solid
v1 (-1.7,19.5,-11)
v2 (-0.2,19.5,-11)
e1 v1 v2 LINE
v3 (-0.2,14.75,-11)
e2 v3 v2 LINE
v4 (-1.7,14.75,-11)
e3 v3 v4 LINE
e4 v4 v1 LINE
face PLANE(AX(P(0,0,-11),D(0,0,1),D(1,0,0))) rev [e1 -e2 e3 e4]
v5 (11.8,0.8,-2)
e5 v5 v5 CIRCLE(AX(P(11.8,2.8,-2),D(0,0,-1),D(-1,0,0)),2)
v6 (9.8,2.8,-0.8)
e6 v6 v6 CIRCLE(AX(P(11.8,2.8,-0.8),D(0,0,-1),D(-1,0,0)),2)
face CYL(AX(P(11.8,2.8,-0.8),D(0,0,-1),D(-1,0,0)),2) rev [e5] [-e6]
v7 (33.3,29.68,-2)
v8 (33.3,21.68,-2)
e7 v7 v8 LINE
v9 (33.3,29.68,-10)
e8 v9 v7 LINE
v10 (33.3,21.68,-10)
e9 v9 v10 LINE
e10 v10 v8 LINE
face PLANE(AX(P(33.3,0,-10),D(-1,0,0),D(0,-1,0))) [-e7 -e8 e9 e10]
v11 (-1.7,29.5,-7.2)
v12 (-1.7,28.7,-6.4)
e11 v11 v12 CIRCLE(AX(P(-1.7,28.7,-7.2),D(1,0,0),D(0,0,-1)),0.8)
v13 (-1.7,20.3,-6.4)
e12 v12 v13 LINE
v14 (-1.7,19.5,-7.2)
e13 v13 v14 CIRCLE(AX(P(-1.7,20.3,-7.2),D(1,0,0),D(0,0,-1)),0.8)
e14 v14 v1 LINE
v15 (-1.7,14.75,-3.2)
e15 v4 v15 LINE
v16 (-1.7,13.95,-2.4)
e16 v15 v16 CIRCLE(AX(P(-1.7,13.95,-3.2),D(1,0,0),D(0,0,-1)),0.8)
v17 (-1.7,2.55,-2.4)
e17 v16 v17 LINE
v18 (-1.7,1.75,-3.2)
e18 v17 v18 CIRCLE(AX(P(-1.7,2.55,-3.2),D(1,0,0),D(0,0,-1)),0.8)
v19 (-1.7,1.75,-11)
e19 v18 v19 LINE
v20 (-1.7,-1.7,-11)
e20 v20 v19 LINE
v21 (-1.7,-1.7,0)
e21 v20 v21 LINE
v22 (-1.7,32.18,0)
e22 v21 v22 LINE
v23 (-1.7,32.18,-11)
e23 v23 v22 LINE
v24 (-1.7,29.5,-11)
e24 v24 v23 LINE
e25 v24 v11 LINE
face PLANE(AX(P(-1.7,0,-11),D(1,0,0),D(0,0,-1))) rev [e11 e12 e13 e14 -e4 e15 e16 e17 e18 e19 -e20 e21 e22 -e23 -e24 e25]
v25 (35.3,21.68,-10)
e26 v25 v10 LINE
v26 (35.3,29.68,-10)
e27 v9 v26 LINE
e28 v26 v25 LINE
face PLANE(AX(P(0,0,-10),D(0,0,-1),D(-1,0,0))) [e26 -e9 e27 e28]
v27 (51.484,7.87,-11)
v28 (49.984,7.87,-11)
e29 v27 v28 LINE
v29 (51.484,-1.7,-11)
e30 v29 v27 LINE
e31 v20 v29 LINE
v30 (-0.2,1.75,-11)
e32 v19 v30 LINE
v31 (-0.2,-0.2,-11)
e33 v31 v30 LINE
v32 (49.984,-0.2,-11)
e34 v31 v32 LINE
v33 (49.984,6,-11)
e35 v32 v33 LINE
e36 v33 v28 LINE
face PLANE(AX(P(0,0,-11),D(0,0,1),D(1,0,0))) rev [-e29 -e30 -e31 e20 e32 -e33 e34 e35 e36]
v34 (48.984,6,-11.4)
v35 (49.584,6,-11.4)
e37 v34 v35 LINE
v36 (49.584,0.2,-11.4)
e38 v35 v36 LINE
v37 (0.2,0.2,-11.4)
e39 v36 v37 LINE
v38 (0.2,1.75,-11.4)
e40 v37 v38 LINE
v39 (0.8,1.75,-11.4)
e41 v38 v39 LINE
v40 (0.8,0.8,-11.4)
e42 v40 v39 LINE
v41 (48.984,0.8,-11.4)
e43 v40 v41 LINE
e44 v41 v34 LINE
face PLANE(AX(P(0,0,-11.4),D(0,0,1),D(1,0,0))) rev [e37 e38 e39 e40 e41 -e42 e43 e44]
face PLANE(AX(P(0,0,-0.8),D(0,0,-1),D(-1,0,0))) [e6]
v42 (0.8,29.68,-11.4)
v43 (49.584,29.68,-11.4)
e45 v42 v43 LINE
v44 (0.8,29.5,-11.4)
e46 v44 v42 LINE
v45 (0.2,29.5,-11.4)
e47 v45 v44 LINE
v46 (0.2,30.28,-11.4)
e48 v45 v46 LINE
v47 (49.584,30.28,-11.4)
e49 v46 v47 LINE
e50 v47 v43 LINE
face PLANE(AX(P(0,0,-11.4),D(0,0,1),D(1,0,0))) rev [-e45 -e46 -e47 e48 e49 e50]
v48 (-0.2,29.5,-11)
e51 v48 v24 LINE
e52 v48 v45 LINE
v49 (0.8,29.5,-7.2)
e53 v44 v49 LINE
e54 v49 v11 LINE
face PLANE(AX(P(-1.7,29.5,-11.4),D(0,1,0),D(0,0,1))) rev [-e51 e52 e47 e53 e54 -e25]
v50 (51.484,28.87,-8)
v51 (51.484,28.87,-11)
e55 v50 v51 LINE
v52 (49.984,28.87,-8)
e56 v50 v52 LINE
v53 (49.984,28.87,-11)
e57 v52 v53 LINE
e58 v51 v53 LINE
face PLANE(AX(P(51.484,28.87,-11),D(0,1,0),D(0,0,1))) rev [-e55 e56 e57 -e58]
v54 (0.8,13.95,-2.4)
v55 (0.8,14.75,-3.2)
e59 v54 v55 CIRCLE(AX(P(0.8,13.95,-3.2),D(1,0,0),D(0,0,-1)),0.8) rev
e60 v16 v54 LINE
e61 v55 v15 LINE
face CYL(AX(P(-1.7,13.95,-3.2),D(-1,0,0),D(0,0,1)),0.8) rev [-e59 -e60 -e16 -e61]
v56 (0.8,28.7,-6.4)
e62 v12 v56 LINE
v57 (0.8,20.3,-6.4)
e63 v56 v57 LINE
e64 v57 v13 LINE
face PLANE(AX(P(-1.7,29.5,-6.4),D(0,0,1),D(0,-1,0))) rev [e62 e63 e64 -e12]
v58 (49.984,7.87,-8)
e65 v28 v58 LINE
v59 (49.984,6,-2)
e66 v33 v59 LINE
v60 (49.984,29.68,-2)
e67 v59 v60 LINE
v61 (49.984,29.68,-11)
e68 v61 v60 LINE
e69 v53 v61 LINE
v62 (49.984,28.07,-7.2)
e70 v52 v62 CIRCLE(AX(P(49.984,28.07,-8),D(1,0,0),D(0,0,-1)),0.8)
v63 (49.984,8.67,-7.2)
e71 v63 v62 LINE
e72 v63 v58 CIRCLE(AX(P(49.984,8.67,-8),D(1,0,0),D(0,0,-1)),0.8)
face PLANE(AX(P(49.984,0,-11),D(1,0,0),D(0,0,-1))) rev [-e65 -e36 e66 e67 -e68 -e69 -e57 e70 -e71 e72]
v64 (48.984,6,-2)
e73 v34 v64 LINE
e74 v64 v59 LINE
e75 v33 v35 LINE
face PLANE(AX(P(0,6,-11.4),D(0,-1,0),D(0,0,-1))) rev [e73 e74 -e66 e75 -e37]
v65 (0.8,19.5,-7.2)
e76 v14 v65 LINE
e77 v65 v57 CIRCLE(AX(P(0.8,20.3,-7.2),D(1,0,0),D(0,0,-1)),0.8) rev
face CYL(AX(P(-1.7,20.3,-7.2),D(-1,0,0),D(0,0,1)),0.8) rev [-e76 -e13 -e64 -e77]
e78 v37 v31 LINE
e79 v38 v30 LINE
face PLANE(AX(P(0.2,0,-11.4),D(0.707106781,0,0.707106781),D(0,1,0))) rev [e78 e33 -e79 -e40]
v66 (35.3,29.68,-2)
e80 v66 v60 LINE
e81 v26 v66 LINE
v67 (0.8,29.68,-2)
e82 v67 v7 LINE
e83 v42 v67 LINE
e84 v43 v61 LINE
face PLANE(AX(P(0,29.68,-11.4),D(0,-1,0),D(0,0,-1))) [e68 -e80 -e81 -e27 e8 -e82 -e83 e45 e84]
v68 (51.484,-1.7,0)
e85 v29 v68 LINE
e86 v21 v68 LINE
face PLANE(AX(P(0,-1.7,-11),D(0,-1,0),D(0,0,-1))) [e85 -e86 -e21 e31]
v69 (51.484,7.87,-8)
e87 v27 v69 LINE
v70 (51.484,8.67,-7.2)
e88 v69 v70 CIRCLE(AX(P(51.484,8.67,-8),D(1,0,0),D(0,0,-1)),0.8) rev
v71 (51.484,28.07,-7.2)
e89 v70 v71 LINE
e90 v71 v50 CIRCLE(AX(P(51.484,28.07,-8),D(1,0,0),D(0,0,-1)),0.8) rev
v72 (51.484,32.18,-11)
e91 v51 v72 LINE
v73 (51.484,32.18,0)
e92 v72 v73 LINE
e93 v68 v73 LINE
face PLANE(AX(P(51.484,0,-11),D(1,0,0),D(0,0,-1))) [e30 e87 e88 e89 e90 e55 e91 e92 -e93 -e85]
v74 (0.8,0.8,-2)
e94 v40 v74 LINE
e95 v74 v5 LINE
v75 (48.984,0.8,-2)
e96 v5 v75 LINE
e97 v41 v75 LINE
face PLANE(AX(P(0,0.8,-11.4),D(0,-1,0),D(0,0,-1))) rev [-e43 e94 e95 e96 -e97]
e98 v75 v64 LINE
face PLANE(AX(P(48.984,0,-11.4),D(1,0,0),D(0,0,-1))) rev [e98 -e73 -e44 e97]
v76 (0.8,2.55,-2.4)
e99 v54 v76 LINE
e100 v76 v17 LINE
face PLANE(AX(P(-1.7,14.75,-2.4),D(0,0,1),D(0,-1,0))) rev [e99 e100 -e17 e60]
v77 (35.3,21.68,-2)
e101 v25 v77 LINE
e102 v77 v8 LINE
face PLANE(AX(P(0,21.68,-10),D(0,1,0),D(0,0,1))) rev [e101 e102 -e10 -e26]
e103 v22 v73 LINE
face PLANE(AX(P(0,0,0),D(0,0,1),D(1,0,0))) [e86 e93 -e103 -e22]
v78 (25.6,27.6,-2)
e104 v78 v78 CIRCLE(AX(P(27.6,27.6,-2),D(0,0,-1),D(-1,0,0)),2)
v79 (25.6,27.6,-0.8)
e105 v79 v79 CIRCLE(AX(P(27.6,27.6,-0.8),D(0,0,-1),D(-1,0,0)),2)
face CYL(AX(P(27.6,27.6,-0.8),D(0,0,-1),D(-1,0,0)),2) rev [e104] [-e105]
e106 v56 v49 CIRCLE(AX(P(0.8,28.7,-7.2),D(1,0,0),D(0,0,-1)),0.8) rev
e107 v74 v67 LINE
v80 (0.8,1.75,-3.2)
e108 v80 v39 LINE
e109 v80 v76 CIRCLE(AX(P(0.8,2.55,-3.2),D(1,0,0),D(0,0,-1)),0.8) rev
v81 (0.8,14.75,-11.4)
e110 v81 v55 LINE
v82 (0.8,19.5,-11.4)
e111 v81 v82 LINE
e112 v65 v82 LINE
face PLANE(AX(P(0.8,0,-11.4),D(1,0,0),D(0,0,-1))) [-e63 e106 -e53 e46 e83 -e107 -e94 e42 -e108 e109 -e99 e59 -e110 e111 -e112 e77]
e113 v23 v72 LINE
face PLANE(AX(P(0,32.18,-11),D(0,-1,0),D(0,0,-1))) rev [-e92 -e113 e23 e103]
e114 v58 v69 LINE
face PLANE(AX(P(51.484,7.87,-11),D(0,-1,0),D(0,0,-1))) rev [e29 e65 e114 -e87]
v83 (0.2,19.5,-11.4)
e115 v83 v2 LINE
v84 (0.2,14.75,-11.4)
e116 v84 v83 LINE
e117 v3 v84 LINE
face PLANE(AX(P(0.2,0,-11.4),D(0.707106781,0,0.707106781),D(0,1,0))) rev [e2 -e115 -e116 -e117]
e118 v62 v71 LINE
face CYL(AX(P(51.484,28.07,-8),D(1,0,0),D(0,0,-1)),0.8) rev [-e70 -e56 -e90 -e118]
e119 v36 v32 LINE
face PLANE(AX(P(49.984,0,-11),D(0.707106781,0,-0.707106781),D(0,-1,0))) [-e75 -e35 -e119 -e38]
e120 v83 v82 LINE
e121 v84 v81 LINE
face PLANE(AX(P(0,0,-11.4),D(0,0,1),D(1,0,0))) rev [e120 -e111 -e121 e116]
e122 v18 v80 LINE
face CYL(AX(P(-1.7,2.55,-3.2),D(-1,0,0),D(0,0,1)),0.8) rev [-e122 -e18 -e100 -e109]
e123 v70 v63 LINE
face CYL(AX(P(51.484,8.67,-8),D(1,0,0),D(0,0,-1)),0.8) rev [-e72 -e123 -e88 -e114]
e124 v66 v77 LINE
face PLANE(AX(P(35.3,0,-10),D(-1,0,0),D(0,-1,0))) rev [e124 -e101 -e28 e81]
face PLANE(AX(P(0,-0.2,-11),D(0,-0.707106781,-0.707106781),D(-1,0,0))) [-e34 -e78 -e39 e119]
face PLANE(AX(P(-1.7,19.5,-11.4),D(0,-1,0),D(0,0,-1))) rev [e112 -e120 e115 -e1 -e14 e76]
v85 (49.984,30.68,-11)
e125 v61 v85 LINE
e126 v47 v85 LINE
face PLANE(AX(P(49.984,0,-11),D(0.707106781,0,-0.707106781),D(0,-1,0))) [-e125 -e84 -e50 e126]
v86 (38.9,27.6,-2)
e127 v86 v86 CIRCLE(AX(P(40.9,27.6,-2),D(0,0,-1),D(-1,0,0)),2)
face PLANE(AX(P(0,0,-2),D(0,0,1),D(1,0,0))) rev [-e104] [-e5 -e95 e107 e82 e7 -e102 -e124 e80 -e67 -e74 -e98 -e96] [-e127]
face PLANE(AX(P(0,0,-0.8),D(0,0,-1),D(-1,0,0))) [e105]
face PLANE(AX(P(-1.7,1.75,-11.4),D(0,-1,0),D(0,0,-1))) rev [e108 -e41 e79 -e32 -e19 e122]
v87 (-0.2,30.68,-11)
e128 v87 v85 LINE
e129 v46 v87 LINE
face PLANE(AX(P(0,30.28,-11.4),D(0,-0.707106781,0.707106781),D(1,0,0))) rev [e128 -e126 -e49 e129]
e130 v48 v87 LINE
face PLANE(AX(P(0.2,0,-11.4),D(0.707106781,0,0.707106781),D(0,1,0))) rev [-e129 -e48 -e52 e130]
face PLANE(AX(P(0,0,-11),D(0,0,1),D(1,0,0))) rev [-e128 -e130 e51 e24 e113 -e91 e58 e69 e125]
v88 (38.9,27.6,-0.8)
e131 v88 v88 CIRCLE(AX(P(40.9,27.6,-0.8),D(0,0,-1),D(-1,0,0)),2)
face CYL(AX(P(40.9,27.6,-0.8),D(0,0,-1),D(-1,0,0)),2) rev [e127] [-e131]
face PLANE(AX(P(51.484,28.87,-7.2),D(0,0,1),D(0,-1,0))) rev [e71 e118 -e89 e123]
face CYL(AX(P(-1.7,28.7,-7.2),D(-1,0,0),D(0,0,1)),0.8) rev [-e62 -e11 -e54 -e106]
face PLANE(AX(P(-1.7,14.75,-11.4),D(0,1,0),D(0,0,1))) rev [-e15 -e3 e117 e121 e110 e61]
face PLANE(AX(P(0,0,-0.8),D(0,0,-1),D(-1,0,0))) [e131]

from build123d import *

# Parameters (mm, degrees)
SKETCH_1_W          = 48.184
SKETCH_1_H          = 28.88
SKETCH_1_W_2        = 1
SKETCH_1_H_2        = 23.68
EXTRUDE_1_DEPTH     = 2
EXTRUDE_2_DEPTH     = 11.4
SKETCH_1_7_W        = 53.184
SKETCH_1_7_H        = 33.88
SKETCH_1_7_W_2      = 50.184
SKETCH_1_7_H_2      = 30.88
EXTRUDE_3_DEPTH     = 11
SKETCH_2_W          = 3.8
SKETCH_2_H          = 21
CUT_EXTRUDE_1_DEPTH = 62.941490586
SKETCH_3_W          = 5
SKETCH_3_H          = 10
SKETCH_3_W_2        = 9
SKETCH_3_H_2        = 13
CUT_EXTRUDE_2_DEPTH = 62.109575813
FILLET_1_R          = 0.8
CHAMFER_1_SIZE      = 0.4
SKETCH_4_R          = 2
CUT_EXTRUDE_3_DEPTH = 1.2
SKETCH_4_3_W        = 2
SKETCH_4_3_H        = 8
EXTRUDE_4_DEPTH     = 8


with BuildPart() as part:
    # Эскиз1 → Бобышка-Вытянуть1 (new body)
    with BuildSketch(Plane.XY):
        with Locations((24.892, 15.24)):
            Rectangle(SKETCH_1_W, SKETCH_1_H)
        with Locations((49.484, 17.84)):
            Rectangle(SKETCH_1_W_2, SKETCH_1_H_2)
    extrude(amount=-EXTRUDE_1_DEPTH)

    # Эскиз1<6> → Бобышка-Вытянуть2 (add)
    with BuildSketch(Plane.XY):
        Polygon((0.8, 29.68), (48.984, 29.68), (49.984, 29.68), (49.984, 30.68), (-0.2, 30.68), (-0.2, -0.2), (49.984, -0.2), (49.984, 6), (48.984, 6), (48.984, 0.8), (0.8, 0.8), align=None)
    extrude(amount=-EXTRUDE_2_DEPTH)

    # Эскиз1<7> → Бобышка-Вытянуть3 (add)
    with BuildSketch(Plane.XY):
        with Locations((24.892, 15.24)):
            Rectangle(SKETCH_1_7_W, SKETCH_1_7_H)
        with Locations((24.892, 15.24)):
            Rectangle(SKETCH_1_7_W_2, SKETCH_1_7_H_2, mode=Mode.SUBTRACT)
    extrude(amount=-EXTRUDE_3_DEPTH)

    # Эскиз2 → Вырез-Вытянуть1 (cut, through all)
    with BuildSketch(Plane.ZY.offset(-49.984)):
        with Locations((-9.1, 18.37)):
            Rectangle(SKETCH_2_W, SKETCH_2_H)
    extrude(amount=-CUT_EXTRUDE_1_DEPTH, mode=Mode.SUBTRACT)

    # Эскиз3 → Вырез-Вытянуть2 (cut, through all)
    with BuildSketch(Plane(origin=(0.8, 0, 0), x_dir=(0, 0, -1), z_dir=(1, 0, 0))):
        with Locations((8.9, 24.5)):
            Rectangle(SKETCH_3_W, SKETCH_3_H)
        with Locations((6.9, 8.25)):
            Rectangle(SKETCH_3_W_2, SKETCH_3_H_2)
    extrude(amount=-CUT_EXTRUDE_2_DEPTH, mode=Mode.SUBTRACT)

    # Скругление1
    fillet_1_edges = [part.edges().sort_by_distance(p)[0] for p in [
        (-0.45, 29.5, -6.4),
        (-0.45, 19.5, -6.4),
        (-0.45, 14.75, -2.4),
        (-0.45, 1.75, -2.4),
        (50.734, 28.87, -7.2),
        (50.734, 7.87, -7.2),
    ]]
    fillet(fillet_1_edges, radius=FILLET_1_R)

    # Фаска1
    chamfer_1_edges = [part.edges().sort_by_distance(p)[0] for p in [
        (-0.2, 0.775, -11.4),
        (24.892, -0.2, -11.4),
        (49.984, 2.9, -11.4),
        (49.984, 30.18, -11.4),
        (24.892, 30.68, -11.4),
        (-0.2, 30.09, -11.4),
        (-0.2, 17.125, -11.4),
    ]]
    chamfer(chamfer_1_edges, length=CHAMFER_1_SIZE - 0.0001)  # a hair under: the kernel refuses the full size

    # Эскиз4 → Вырез-Вытянуть3 (cut)
    with BuildSketch(Plane(origin=(0, 0, -2), x_dir=(-1, 0, 0), z_dir=(0, 0, -1))):
        with Locations((-40.9, 27.6)):
            Circle(SKETCH_4_R)
        with Locations((-27.6, 27.6)):
            Circle(SKETCH_4_R)
        with Locations((-11.8, 2.8)):
            Circle(SKETCH_4_R)
    extrude(amount=-CUT_EXTRUDE_3_DEPTH, mode=Mode.SUBTRACT)

    # Эскиз4<3> → Бобышка-Вытянуть4 (add)
    with BuildSketch(Plane(origin=(0, 0, -2), x_dir=(-1, 0, 0), z_dir=(0, 0, -1))):
        with Locations((-34.3, 25.68)):
            Rectangle(SKETCH_4_3_W, SKETCH_4_3_H)
    extrude(amount=EXTRUDE_4_DEPTH)


solid = part.part
